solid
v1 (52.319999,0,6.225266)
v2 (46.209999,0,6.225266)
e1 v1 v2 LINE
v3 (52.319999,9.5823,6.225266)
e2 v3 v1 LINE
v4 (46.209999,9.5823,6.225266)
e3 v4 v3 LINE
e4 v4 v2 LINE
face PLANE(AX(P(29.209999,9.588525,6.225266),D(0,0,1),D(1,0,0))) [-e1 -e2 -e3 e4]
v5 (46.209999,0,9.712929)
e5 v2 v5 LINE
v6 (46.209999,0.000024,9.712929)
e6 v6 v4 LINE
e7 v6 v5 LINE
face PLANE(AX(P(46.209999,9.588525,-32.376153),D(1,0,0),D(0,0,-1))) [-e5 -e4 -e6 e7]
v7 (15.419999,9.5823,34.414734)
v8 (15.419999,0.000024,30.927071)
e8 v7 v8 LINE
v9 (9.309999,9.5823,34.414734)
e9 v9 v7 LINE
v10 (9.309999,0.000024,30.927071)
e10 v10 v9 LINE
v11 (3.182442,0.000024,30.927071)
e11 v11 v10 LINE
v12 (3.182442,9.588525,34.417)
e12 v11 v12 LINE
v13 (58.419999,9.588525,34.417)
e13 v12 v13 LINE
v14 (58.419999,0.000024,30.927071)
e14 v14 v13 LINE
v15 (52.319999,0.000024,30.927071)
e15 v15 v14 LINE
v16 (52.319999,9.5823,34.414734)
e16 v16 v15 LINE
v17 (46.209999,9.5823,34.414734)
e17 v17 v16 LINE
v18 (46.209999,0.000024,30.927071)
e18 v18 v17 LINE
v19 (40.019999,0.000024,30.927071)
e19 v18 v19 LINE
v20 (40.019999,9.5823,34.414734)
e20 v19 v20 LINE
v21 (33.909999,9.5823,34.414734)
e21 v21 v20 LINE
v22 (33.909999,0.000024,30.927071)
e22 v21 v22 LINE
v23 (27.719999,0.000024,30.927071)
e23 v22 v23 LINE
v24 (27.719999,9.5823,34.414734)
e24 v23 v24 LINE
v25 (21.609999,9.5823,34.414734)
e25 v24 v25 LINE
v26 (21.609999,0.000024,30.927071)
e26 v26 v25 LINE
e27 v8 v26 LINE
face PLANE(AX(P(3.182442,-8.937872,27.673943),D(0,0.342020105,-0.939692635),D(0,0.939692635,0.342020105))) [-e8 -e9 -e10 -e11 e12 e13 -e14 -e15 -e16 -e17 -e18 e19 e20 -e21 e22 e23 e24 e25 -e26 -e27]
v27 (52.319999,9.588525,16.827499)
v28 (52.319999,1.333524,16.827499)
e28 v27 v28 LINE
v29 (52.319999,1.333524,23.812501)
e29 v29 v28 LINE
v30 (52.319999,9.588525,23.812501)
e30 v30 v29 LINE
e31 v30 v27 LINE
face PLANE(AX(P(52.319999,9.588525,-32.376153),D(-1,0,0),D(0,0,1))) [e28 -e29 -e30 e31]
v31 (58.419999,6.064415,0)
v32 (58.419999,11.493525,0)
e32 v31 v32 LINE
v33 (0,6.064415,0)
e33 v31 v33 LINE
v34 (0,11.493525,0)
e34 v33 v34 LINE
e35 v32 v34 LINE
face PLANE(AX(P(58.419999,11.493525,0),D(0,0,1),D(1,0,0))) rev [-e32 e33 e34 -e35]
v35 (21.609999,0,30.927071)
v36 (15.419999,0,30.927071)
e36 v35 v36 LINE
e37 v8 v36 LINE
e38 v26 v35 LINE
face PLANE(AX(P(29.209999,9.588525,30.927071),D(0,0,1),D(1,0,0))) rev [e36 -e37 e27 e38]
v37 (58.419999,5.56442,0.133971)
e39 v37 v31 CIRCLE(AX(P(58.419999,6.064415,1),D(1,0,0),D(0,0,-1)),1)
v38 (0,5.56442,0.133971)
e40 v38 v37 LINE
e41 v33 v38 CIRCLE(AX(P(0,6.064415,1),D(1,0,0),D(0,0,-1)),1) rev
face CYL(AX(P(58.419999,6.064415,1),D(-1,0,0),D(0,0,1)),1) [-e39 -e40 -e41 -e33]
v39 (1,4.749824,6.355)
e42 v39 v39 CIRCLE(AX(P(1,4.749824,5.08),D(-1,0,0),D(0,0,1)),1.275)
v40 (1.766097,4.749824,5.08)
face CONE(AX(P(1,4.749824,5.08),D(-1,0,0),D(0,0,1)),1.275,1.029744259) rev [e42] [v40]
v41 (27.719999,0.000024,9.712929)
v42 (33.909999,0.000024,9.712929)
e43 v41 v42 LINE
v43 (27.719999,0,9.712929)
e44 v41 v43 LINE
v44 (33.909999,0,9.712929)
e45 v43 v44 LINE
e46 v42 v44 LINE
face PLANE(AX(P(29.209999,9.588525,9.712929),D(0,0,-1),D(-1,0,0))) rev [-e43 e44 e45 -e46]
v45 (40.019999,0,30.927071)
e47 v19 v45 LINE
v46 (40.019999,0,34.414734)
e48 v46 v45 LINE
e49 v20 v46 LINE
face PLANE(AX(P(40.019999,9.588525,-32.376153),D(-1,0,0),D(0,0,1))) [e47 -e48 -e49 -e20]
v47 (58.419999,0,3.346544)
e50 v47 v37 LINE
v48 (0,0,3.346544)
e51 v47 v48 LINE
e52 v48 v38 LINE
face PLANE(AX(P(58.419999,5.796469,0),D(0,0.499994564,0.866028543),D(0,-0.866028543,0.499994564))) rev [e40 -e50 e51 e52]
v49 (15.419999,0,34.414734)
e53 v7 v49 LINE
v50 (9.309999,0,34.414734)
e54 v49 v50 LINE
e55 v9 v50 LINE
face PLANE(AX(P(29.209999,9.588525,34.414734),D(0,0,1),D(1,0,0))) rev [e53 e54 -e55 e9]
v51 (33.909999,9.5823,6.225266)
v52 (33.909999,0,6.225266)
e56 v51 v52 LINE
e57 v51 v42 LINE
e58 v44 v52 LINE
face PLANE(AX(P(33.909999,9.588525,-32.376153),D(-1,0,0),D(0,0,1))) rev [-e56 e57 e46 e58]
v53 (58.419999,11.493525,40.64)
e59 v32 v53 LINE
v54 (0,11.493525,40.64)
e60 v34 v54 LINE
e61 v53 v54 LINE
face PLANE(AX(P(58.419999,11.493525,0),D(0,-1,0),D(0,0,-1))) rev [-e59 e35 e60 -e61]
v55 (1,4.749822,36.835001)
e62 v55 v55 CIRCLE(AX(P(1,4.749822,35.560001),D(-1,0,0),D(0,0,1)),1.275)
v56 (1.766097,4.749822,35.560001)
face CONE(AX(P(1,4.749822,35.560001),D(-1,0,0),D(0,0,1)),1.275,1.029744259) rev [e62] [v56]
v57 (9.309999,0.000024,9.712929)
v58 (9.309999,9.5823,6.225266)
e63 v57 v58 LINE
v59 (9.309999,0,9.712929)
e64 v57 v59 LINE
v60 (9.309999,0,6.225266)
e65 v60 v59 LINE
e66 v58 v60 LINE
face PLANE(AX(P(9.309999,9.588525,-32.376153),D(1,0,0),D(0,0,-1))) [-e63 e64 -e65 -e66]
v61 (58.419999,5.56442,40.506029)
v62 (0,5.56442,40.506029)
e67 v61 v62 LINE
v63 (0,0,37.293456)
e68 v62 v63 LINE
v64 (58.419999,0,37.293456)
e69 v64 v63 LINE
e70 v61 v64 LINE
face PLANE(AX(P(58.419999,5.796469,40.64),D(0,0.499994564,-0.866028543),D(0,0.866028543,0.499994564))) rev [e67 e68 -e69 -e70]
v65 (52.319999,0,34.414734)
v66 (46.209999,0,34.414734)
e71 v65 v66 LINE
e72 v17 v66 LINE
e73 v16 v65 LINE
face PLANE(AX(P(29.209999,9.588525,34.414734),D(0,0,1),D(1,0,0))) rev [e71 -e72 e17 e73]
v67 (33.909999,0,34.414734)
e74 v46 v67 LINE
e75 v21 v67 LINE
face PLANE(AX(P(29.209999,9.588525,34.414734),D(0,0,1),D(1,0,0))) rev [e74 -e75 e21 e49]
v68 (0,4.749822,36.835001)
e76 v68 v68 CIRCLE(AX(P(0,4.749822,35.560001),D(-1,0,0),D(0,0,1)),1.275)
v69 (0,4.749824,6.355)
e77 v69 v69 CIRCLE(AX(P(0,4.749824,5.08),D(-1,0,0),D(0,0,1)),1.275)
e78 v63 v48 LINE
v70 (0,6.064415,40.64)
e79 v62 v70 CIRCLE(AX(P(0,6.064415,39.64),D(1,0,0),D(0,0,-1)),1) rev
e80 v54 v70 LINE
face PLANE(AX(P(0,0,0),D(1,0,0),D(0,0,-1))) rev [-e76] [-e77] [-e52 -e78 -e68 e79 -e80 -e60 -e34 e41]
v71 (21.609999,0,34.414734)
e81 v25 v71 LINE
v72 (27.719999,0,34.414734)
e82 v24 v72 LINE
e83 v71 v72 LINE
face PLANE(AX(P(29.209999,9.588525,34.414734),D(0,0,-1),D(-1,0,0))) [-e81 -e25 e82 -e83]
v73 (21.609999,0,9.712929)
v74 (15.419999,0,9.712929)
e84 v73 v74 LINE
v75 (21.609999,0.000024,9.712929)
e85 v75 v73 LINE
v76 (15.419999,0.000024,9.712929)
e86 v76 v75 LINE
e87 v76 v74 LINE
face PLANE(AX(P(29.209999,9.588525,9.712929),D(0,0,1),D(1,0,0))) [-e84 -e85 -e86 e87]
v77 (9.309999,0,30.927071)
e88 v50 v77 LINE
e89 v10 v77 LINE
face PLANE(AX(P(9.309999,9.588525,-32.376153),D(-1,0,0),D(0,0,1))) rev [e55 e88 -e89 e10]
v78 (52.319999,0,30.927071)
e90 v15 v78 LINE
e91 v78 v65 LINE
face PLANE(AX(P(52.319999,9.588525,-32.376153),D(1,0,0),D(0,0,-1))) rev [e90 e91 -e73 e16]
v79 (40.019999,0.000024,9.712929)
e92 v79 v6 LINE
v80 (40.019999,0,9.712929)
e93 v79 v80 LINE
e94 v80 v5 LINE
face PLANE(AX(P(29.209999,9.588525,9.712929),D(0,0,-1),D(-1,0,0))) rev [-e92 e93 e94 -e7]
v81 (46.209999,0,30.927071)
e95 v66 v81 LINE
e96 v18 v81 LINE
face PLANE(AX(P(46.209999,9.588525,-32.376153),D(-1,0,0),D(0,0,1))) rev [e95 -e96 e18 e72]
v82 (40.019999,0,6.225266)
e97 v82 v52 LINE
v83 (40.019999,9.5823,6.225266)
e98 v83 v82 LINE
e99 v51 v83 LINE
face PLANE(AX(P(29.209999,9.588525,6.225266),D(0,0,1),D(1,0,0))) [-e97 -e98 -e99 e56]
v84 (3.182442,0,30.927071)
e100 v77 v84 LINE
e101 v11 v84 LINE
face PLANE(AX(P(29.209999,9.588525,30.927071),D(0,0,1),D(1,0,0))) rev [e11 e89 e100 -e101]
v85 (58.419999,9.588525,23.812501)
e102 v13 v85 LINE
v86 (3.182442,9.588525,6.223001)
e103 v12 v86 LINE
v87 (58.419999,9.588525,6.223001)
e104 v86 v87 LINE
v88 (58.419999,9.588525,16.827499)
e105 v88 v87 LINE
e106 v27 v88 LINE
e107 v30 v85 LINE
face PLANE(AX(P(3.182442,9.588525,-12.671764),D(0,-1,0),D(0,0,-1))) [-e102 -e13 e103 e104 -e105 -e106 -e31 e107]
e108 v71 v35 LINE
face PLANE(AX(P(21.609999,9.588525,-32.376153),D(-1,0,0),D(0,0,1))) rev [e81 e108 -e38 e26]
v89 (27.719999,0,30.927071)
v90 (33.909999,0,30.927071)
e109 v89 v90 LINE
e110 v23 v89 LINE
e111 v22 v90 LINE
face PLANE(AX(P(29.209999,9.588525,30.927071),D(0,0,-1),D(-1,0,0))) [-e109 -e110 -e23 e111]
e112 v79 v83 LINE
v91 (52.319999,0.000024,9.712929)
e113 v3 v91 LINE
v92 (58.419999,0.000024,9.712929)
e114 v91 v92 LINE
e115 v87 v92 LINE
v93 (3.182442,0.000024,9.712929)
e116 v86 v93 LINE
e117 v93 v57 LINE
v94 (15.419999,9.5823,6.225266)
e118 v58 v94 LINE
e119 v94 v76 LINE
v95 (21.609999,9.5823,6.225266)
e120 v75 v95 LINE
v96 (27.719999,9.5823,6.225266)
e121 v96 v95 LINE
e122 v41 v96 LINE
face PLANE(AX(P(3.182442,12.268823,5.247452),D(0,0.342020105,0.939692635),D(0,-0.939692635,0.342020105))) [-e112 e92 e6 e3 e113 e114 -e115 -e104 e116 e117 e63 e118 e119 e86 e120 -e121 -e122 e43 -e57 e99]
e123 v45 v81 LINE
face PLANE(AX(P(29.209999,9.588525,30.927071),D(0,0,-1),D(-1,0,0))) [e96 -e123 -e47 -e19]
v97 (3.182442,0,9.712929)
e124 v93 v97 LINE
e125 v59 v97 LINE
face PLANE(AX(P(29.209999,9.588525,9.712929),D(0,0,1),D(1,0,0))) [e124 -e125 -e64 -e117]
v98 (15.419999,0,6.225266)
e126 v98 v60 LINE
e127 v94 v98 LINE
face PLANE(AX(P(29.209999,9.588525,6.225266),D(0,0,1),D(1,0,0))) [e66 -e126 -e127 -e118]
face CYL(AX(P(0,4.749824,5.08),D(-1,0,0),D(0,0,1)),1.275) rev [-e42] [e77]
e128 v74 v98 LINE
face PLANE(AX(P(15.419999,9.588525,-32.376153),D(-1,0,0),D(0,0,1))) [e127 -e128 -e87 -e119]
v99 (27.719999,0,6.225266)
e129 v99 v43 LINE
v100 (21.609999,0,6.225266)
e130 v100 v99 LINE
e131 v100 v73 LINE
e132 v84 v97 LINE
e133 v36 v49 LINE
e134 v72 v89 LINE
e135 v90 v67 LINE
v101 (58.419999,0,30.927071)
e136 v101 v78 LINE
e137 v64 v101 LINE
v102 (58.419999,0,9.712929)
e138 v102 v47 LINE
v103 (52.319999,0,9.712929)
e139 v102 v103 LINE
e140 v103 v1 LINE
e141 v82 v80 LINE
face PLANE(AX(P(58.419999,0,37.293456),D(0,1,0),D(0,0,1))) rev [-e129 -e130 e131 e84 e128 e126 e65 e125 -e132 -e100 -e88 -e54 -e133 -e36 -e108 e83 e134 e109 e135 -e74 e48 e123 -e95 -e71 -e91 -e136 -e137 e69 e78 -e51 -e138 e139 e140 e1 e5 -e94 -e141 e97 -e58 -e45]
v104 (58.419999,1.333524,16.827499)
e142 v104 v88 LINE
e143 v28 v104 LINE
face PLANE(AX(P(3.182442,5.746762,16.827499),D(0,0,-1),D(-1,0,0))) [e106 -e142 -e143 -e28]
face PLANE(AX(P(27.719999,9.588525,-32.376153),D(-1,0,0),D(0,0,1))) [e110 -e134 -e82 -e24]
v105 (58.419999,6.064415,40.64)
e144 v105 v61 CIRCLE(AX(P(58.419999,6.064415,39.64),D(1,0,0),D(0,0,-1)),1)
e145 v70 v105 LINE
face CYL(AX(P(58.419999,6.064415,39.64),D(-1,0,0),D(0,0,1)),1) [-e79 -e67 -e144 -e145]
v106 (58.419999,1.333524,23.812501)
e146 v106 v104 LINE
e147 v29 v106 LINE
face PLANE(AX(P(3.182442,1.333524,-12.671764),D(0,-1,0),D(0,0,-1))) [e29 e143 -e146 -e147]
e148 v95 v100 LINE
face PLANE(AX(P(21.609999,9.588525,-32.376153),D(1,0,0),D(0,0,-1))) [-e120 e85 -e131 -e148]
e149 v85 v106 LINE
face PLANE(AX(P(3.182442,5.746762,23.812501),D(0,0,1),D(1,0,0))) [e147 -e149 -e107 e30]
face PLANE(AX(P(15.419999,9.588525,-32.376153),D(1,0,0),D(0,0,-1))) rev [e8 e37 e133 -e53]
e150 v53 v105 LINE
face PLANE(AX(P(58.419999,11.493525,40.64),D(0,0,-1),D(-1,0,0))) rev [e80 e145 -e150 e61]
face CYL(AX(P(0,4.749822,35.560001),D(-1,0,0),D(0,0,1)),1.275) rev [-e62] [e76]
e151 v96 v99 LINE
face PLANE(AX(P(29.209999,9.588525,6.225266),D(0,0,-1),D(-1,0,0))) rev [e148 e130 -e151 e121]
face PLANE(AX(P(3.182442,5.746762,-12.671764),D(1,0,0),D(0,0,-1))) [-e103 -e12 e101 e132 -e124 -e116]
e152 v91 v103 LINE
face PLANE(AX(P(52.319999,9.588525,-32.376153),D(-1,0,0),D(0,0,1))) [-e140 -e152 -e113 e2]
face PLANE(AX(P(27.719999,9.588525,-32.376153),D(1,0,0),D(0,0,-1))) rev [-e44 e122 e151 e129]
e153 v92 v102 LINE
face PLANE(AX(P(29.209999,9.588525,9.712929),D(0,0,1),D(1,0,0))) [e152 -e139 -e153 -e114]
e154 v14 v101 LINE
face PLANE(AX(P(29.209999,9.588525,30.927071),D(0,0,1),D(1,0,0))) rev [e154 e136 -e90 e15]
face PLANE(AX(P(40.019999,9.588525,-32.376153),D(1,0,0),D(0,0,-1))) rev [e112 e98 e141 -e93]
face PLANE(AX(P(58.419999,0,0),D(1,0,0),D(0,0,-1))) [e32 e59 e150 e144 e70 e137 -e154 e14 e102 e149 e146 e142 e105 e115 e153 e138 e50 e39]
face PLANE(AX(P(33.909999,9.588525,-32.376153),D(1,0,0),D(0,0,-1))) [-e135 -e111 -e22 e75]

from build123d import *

# Parameters (mm, degrees)
EXTRUDE_340_DEPTH        = 58.419998735
SKETCH_393_W             = 6.985001266
SKETCH_393_H             = 1.333500259
CUT_EXTRUDE_2374_DEPTH   = 55.237557
CUT_EXTRUDE_START        = -9.588525
CUT_EXTRUDE_2430_DEPTH   = 9.588525
SKETCH_5_W               = 6.1
SKETCH_5_H               = 6.985001266
CUT_EXTRUDE_2514_DEPTH   = 1.333524
HOLE_WIZARD_M2_5_1_D     = 2.55
HOLE_WIZARD_M2_5_1_DEPTH = 1
HOLE_WIZARD_M2_5_1_TIP   = 0.766097289
FILLET_1_R               = 1


with BuildPart() as part:
    # Extrude 340: read off the stored shape, not the designer's step
    # Extrude 340 outline → Extrude 340 (new body)
    with BuildSketch(Plane(origin=(0, 0, 0), x_dir=(0, 0, -1), z_dir=(1, 0, 0))):
        Polygon((0, 5.796468934), (0, 11.493524536), (-40.640000254, 11.493524536), (-40.640000254, 5.796468934), (-37.29345587, 0), (-3.346544384, 0), align=None)
    extrude(amount=EXTRUDE_340_DEPTH)

    # Sketch 393 → Cut-Extrude 2374 (cut)
    with BuildSketch(Plane(origin=(58.419998735, 0, 0), x_dir=(0, 0, -1), z_dir=(1, 0, 0))):
        Polygon((-23.81250076, 2.4214e-05), (-23.81250076, 1.333524473), (-23.81250076, 9.588524699), (-34.416999668, 9.588524699), (-30.927071348, 2.4214e-05), align=None)
        with Locations((-20.320000127, 0.666774343)):
            Rectangle(SKETCH_393_W, SKETCH_393_H)
        Polygon((-16.827499494, 9.588524699), (-16.827499494, 1.333524473), (-16.827499494, 2.4214e-05), (-9.712928906, 2.4214e-05), (-6.223000586, 9.588524699), align=None)
    extrude(amount=-CUT_EXTRUDE_2374_DEPTH, mode=Mode.SUBTRACT)

    # Sketch 1050 → Cut-Extrude 2430 (cut)
    with BuildSketch(Plane.XZ.offset(CUT_EXTRUDE_START)):
        Polygon((58.419998735, 23.81250076), (58.419998735, 30.927071348), (52.319998735, 30.927071348), (52.319998735, 34.414733996), (46.209998735, 34.414733996), (46.209998735, 30.927071348), (40.019998735, 30.927071348), (40.019998735, 34.414733996), (33.909998735, 34.414733996), (33.909998735, 30.927071348), (27.719998735, 30.927071348), (27.719998735, 34.414733996), (21.609998735, 34.414733996), (21.609998735, 30.927071348), (15.419998735, 30.927071348), (15.419998735, 34.414733996), (9.309998735, 34.414733996), (9.309998735, 30.927071348), (3.182441867, 30.927071348), (3.182441867, 9.712928906), (9.309998735, 9.712928906), (9.309998735, 6.225266258), (15.419998735, 6.225266258), (15.419998735, 9.712928906), (21.609998735, 9.712928906), (21.609998735, 6.225266258), (27.719998735, 6.225266258), (27.719998735, 9.712928906), (33.909998735, 9.712928906), (33.909998735, 6.225266258), (40.019998735, 6.225266258), (40.019998735, 9.712928906), (46.209998735, 9.712928906), (46.209998735, 6.225266258), (52.319998735, 6.225266258), (52.319998735, 9.712928906), (58.419998735, 9.712928906), (58.419998735, 16.827499494), (52.319998735, 16.827499494), (52.319998735, 23.81250076), align=None)
    extrude(amount=CUT_EXTRUDE_2430_DEPTH, mode=Mode.SUBTRACT)


with BuildPart() as cut_extrude_2430_piece_1:
    # of the separate pieces the step leaves, piece 1, a body of its own (cut_extrude_2430_pieces)
    add(part.part.solids().sort_by_distance((0, 5.796468934, 0))[0])

    # M2.5 螺旋的螺纹孔钻头1
    with Locations(Plane(origin=(0, 4.749824371, 5.079999834), x_dir=(0, 0, -1), z_dir=(-1, 0, 0))):
        with Locations((0, 0), (-30.480000761, 2.389e-06)):
            Hole(HOLE_WIZARD_M2_5_1_D / 2, depth=HOLE_WIZARD_M2_5_1_DEPTH)
            with Locations((0, 0, -(HOLE_WIZARD_M2_5_1_DEPTH + HOLE_WIZARD_M2_5_1_TIP / 2))):  # 118° drill point
                Cone(0, HOLE_WIZARD_M2_5_1_D / 2, HOLE_WIZARD_M2_5_1_TIP, mode=Mode.SUBTRACT)

    # 圆角1
    fillet_1_edges = [cut_extrude_2430_piece_1.edges().sort_by_distance(p)[0] for p in [
        (29.209999368, 5.796468934, 0),
        (29.209999368, 5.796468934, 40.640000254),
    ]]
    fillet(fillet_1_edges, radius=FILLET_1_R)


with BuildPart() as cut_extrude_2430_piece_2:
    # of the separate pieces the step leaves, piece 2, a body of its own (cut_extrude_2430_pieces)
    add(part.part.solids().sort_by_distance((58.419998735, 0, 23.81250076))[0])

    # 顶面开口切面<5> → Cut-Extrude 2514 (cut)
    with BuildSketch(Plane.XZ):
        with Locations((55.369998735, 20.320000127)):
            Rectangle(SKETCH_5_W, SKETCH_5_H)
    extrude(amount=-CUT_EXTRUDE_2514_DEPTH, mode=Mode.SUBTRACT)


solid = cut_extrude_2430_piece_1.part
